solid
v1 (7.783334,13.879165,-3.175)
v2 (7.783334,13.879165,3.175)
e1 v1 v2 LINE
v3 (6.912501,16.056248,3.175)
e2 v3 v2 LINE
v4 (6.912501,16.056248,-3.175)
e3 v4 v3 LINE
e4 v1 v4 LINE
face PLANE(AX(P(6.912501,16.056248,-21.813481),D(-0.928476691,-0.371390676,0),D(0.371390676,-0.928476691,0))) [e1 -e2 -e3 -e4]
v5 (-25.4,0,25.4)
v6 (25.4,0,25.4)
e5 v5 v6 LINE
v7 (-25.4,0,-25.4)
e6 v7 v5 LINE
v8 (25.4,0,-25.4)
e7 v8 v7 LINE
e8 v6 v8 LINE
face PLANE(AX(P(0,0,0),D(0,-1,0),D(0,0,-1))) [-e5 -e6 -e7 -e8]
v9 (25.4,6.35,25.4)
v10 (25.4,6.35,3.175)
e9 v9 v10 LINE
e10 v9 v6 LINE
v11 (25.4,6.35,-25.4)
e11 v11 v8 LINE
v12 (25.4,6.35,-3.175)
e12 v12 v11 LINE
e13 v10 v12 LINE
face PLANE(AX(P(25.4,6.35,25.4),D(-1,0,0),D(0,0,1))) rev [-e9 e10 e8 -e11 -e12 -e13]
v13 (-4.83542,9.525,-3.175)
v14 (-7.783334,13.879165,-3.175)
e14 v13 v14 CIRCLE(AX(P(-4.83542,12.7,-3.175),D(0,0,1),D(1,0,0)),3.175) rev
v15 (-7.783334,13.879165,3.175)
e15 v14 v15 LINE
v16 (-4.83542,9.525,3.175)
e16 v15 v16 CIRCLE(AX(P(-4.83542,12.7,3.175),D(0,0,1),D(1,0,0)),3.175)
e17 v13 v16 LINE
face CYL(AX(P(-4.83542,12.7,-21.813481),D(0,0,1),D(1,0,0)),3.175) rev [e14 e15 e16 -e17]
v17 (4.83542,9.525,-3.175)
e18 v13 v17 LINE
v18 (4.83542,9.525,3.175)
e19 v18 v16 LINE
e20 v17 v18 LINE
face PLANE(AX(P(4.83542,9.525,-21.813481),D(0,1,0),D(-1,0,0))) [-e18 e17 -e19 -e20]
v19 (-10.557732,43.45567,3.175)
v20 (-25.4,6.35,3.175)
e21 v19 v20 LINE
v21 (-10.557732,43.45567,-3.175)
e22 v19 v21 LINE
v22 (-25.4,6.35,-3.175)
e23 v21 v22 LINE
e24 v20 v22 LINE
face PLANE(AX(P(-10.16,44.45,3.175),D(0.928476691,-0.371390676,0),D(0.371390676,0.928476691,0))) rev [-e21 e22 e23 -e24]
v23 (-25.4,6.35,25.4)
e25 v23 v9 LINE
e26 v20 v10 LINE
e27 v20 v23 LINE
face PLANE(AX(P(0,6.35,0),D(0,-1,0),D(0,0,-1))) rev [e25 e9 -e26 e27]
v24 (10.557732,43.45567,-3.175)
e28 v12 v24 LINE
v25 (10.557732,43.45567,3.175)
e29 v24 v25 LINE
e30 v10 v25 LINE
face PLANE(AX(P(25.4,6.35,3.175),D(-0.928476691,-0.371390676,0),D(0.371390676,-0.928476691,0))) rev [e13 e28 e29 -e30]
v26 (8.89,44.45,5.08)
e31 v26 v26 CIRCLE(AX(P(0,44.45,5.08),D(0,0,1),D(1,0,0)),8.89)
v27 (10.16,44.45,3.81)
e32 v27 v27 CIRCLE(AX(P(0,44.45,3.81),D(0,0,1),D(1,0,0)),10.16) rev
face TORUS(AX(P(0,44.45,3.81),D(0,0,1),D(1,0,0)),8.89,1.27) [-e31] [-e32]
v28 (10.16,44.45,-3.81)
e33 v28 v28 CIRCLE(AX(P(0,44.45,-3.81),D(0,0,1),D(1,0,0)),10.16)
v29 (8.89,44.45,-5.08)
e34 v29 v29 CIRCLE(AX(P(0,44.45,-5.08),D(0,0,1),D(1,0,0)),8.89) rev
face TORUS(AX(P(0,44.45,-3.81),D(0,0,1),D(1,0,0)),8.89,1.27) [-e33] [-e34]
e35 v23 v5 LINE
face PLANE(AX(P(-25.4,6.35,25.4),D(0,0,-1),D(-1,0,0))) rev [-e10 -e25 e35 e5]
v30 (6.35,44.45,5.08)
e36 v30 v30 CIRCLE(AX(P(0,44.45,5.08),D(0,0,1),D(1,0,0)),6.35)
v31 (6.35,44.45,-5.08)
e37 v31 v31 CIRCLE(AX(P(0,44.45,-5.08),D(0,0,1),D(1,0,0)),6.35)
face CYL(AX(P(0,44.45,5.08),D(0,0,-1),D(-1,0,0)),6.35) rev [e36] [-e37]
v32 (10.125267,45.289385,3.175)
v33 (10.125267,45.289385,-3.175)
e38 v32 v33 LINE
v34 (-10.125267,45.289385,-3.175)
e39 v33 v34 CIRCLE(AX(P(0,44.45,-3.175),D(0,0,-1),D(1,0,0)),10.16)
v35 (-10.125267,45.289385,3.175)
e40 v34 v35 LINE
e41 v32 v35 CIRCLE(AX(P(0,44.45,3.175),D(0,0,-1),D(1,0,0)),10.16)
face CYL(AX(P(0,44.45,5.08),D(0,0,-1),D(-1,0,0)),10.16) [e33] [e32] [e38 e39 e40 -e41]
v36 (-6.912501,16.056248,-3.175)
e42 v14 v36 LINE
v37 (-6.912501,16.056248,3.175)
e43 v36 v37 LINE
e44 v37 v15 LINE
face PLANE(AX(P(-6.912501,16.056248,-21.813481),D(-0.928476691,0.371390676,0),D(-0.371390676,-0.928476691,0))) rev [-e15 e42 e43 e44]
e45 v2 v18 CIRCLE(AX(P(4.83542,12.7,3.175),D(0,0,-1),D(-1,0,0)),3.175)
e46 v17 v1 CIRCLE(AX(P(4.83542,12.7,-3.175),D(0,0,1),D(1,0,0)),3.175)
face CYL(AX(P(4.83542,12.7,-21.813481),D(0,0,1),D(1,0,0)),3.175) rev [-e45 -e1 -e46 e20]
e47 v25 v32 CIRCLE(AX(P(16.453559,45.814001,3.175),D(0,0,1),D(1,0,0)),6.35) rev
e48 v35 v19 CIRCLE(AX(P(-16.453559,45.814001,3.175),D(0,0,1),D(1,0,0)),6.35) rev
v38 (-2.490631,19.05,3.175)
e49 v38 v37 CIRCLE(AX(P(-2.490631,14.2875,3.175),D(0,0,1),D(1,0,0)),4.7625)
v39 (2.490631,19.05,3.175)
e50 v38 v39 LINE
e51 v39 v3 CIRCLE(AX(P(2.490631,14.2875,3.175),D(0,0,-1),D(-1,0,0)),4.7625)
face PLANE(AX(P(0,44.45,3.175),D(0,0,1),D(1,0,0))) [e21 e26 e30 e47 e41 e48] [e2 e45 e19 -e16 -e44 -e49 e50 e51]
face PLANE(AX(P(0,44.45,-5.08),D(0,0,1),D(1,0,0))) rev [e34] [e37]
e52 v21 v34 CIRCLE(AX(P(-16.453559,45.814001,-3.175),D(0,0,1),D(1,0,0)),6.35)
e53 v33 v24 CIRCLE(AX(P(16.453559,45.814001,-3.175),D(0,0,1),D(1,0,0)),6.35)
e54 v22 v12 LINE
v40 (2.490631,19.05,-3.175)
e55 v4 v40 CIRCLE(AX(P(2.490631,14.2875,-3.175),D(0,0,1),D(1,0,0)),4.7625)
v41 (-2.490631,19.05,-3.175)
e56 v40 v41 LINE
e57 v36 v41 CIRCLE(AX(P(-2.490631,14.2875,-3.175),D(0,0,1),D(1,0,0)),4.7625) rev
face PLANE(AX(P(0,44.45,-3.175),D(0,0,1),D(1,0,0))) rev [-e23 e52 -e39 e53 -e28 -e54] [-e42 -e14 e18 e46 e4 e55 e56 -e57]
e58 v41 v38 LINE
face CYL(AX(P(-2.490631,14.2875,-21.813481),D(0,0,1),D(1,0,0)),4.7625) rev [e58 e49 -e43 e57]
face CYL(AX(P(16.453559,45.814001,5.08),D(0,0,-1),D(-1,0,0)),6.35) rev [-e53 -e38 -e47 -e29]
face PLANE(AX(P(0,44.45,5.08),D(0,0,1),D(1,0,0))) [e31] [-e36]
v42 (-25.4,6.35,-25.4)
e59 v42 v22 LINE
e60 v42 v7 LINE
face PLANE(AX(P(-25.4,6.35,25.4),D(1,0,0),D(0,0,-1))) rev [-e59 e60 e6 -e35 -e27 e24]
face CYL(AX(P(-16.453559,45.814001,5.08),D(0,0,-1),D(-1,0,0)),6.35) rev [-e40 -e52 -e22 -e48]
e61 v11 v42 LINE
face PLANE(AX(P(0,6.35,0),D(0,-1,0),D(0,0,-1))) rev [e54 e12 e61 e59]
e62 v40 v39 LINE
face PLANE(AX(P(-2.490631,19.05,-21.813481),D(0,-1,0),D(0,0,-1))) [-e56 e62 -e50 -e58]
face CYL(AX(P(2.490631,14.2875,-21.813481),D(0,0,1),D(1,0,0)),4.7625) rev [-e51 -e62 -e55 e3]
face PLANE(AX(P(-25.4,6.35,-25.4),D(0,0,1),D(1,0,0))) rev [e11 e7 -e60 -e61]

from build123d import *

# Parameters (mm, degrees)
SKETCH1_W           = 50.8
SKETCH1_H           = 50.8
BOSS_EXTRUDE1_DEPTH = 6.35
SKETCH2_R           = 10.16
SKETCH2_R_2         = 6.35
BOSS_EXTRUDE2_DEPTH = 5.08
BOSS_EXTRUDE3_DEPTH = 3.175
FILLET3_R           = 6.35
CUT_EXTRUDE1_DEPTH  = 6.35


with BuildPart() as part:
    # Sketch1 → Boss-Extrude1 (new body)
    with BuildSketch(Plane(origin=(0, 0, 0), x_dir=(1, 0, 0), z_dir=(0, 1, 0))):
        Rectangle(SKETCH1_W, SKETCH1_H)
    extrude(amount=BOSS_EXTRUDE1_DEPTH)



with BuildPart() as body_2:
    # Sketch2 → Boss-Extrude2 (new, symmetric)
    with BuildSketch(Plane.XY):
        with Locations((0, 44.45)):
            Circle(SKETCH2_R)
        with Locations((0, 44.45)):
            Circle(SKETCH2_R_2, mode=Mode.SUBTRACT)
    extrude(amount=BOSS_EXTRUDE2_DEPTH, both=True)


with BuildPart() as part_1:
    add(part.part)

    add(body_2.part)  # Boss-Extrude3 merges body 2
    # Sketch4 → Boss-Extrude3 (add, symmetric)
    with BuildSketch(Plane.XY):
        with BuildLine():
            Line((-10.16, 44.45), (-25.4, 6.35))
            Line((-25.4, 6.35), (25.4, 6.35))
            Line((25.4, 6.35), (10.16, 44.45))
            ThreePointArc((10.16, 44.45), (0, 34.29), (-10.16, 44.45))
        make_face()
    extrude(amount=BOSS_EXTRUDE3_DEPTH, both=True)

    # Fillet2: read off the stored shape, not the designer's step
    # Fillet2 outline → Fillet2 (revolve, cut)
    with BuildSketch(Plane.XZ.offset(-44.45)):
        with BuildLine():
            ThreePointArc((10.16, -3.81), (9.788025612, -4.708025612), (8.89, -5.08))
            Line((8.89, -5.08), (10.16, -5.08))
            Line((10.16, -5.08), (10.16, -3.81))
        make_face()
        with BuildLine():
            ThreePointArc((8.89, 5.08), (9.788025612, 4.708025612), (10.16, 3.81))
            Line((10.16, 3.81), (10.16, 5.08))
            Line((10.16, 5.08), (8.89, 5.08))
        make_face()
    revolve(axis=Axis((0, 44.45, 0), (0, 0, 1)), mode=Mode.SUBTRACT)

    # Fillet3
    # the kernel refuses this fillet: 6.35 mm, written as the material it adds along each edge
    with BuildSketch(Plane(origin=(10.16, 44.45, 3.175), x_dir=(-0.041343675933645734, 0.9991449847045691, 0), z_dir=(0, 0, -1))) as fillet3_piece_1:
        with BuildLine():
            CenterArc((1.102635837, 6.344570653), FILLET3_R, 250.56808401, 17.062422493)
            Line((-1.009923388, 0.356282624), (0, 0))
            ThreePointArc((0, 0), (0.420051747, 0.008686955), (0.840103495, 0))
        make_face()
    extrude(amount=6.35)
    with BuildSketch(Plane(origin=(-10.16, 44.45, 3.175), x_dir=(0.04134367593364538, 0.9991449847045691, 0), z_dir=(0, 0, -1))) as fillet3_piece_2:
        with BuildLine():
            CenterArc((1.102635837, -6.344570653), FILLET3_R, 92.369493497, 17.062422493)
            Line((-1.009923388, -0.356282624), (0, 0))
            ThreePointArc((0, 0), (0.420051747, -0.008686955), (0.840103495, 0))
        make_face()
    extrude(amount=6.35)

    # Sketch6 → Cut-Extrude1 (cut)
    with BuildSketch(Plane.XY.offset(3.175)):
        with BuildLine():
            Line((-2.490630521, 19.05), (2.490630521, 19.05))
            ThreePointArc((2.490630521, 19.05), (5.160625226, 18.231170185), (6.912500762, 16.056248096))
            Line((6.912500762, 16.056248096), (7.783333841, 13.879165397))
            ThreePointArc((7.783333841, 13.879165397), (7.464533804, 10.92000353), (4.835420347, 9.525))
            Line((4.835420347, 9.525), (-4.835420347, 9.525))
            ThreePointArc((-4.835420347, 9.525), (-7.464533804, 10.92000353), (-7.783333841, 13.879165397))
            Line((-7.783333841, 13.879165397), (-6.912500762, 16.056248096))
            ThreePointArc((-6.912500762, 16.056248096), (-5.160625226, 18.231170185), (-2.490630521, 19.05))
        make_face()
    extrude(amount=-CUT_EXTRUDE1_DEPTH, mode=Mode.SUBTRACT)


solid = part_1.part
